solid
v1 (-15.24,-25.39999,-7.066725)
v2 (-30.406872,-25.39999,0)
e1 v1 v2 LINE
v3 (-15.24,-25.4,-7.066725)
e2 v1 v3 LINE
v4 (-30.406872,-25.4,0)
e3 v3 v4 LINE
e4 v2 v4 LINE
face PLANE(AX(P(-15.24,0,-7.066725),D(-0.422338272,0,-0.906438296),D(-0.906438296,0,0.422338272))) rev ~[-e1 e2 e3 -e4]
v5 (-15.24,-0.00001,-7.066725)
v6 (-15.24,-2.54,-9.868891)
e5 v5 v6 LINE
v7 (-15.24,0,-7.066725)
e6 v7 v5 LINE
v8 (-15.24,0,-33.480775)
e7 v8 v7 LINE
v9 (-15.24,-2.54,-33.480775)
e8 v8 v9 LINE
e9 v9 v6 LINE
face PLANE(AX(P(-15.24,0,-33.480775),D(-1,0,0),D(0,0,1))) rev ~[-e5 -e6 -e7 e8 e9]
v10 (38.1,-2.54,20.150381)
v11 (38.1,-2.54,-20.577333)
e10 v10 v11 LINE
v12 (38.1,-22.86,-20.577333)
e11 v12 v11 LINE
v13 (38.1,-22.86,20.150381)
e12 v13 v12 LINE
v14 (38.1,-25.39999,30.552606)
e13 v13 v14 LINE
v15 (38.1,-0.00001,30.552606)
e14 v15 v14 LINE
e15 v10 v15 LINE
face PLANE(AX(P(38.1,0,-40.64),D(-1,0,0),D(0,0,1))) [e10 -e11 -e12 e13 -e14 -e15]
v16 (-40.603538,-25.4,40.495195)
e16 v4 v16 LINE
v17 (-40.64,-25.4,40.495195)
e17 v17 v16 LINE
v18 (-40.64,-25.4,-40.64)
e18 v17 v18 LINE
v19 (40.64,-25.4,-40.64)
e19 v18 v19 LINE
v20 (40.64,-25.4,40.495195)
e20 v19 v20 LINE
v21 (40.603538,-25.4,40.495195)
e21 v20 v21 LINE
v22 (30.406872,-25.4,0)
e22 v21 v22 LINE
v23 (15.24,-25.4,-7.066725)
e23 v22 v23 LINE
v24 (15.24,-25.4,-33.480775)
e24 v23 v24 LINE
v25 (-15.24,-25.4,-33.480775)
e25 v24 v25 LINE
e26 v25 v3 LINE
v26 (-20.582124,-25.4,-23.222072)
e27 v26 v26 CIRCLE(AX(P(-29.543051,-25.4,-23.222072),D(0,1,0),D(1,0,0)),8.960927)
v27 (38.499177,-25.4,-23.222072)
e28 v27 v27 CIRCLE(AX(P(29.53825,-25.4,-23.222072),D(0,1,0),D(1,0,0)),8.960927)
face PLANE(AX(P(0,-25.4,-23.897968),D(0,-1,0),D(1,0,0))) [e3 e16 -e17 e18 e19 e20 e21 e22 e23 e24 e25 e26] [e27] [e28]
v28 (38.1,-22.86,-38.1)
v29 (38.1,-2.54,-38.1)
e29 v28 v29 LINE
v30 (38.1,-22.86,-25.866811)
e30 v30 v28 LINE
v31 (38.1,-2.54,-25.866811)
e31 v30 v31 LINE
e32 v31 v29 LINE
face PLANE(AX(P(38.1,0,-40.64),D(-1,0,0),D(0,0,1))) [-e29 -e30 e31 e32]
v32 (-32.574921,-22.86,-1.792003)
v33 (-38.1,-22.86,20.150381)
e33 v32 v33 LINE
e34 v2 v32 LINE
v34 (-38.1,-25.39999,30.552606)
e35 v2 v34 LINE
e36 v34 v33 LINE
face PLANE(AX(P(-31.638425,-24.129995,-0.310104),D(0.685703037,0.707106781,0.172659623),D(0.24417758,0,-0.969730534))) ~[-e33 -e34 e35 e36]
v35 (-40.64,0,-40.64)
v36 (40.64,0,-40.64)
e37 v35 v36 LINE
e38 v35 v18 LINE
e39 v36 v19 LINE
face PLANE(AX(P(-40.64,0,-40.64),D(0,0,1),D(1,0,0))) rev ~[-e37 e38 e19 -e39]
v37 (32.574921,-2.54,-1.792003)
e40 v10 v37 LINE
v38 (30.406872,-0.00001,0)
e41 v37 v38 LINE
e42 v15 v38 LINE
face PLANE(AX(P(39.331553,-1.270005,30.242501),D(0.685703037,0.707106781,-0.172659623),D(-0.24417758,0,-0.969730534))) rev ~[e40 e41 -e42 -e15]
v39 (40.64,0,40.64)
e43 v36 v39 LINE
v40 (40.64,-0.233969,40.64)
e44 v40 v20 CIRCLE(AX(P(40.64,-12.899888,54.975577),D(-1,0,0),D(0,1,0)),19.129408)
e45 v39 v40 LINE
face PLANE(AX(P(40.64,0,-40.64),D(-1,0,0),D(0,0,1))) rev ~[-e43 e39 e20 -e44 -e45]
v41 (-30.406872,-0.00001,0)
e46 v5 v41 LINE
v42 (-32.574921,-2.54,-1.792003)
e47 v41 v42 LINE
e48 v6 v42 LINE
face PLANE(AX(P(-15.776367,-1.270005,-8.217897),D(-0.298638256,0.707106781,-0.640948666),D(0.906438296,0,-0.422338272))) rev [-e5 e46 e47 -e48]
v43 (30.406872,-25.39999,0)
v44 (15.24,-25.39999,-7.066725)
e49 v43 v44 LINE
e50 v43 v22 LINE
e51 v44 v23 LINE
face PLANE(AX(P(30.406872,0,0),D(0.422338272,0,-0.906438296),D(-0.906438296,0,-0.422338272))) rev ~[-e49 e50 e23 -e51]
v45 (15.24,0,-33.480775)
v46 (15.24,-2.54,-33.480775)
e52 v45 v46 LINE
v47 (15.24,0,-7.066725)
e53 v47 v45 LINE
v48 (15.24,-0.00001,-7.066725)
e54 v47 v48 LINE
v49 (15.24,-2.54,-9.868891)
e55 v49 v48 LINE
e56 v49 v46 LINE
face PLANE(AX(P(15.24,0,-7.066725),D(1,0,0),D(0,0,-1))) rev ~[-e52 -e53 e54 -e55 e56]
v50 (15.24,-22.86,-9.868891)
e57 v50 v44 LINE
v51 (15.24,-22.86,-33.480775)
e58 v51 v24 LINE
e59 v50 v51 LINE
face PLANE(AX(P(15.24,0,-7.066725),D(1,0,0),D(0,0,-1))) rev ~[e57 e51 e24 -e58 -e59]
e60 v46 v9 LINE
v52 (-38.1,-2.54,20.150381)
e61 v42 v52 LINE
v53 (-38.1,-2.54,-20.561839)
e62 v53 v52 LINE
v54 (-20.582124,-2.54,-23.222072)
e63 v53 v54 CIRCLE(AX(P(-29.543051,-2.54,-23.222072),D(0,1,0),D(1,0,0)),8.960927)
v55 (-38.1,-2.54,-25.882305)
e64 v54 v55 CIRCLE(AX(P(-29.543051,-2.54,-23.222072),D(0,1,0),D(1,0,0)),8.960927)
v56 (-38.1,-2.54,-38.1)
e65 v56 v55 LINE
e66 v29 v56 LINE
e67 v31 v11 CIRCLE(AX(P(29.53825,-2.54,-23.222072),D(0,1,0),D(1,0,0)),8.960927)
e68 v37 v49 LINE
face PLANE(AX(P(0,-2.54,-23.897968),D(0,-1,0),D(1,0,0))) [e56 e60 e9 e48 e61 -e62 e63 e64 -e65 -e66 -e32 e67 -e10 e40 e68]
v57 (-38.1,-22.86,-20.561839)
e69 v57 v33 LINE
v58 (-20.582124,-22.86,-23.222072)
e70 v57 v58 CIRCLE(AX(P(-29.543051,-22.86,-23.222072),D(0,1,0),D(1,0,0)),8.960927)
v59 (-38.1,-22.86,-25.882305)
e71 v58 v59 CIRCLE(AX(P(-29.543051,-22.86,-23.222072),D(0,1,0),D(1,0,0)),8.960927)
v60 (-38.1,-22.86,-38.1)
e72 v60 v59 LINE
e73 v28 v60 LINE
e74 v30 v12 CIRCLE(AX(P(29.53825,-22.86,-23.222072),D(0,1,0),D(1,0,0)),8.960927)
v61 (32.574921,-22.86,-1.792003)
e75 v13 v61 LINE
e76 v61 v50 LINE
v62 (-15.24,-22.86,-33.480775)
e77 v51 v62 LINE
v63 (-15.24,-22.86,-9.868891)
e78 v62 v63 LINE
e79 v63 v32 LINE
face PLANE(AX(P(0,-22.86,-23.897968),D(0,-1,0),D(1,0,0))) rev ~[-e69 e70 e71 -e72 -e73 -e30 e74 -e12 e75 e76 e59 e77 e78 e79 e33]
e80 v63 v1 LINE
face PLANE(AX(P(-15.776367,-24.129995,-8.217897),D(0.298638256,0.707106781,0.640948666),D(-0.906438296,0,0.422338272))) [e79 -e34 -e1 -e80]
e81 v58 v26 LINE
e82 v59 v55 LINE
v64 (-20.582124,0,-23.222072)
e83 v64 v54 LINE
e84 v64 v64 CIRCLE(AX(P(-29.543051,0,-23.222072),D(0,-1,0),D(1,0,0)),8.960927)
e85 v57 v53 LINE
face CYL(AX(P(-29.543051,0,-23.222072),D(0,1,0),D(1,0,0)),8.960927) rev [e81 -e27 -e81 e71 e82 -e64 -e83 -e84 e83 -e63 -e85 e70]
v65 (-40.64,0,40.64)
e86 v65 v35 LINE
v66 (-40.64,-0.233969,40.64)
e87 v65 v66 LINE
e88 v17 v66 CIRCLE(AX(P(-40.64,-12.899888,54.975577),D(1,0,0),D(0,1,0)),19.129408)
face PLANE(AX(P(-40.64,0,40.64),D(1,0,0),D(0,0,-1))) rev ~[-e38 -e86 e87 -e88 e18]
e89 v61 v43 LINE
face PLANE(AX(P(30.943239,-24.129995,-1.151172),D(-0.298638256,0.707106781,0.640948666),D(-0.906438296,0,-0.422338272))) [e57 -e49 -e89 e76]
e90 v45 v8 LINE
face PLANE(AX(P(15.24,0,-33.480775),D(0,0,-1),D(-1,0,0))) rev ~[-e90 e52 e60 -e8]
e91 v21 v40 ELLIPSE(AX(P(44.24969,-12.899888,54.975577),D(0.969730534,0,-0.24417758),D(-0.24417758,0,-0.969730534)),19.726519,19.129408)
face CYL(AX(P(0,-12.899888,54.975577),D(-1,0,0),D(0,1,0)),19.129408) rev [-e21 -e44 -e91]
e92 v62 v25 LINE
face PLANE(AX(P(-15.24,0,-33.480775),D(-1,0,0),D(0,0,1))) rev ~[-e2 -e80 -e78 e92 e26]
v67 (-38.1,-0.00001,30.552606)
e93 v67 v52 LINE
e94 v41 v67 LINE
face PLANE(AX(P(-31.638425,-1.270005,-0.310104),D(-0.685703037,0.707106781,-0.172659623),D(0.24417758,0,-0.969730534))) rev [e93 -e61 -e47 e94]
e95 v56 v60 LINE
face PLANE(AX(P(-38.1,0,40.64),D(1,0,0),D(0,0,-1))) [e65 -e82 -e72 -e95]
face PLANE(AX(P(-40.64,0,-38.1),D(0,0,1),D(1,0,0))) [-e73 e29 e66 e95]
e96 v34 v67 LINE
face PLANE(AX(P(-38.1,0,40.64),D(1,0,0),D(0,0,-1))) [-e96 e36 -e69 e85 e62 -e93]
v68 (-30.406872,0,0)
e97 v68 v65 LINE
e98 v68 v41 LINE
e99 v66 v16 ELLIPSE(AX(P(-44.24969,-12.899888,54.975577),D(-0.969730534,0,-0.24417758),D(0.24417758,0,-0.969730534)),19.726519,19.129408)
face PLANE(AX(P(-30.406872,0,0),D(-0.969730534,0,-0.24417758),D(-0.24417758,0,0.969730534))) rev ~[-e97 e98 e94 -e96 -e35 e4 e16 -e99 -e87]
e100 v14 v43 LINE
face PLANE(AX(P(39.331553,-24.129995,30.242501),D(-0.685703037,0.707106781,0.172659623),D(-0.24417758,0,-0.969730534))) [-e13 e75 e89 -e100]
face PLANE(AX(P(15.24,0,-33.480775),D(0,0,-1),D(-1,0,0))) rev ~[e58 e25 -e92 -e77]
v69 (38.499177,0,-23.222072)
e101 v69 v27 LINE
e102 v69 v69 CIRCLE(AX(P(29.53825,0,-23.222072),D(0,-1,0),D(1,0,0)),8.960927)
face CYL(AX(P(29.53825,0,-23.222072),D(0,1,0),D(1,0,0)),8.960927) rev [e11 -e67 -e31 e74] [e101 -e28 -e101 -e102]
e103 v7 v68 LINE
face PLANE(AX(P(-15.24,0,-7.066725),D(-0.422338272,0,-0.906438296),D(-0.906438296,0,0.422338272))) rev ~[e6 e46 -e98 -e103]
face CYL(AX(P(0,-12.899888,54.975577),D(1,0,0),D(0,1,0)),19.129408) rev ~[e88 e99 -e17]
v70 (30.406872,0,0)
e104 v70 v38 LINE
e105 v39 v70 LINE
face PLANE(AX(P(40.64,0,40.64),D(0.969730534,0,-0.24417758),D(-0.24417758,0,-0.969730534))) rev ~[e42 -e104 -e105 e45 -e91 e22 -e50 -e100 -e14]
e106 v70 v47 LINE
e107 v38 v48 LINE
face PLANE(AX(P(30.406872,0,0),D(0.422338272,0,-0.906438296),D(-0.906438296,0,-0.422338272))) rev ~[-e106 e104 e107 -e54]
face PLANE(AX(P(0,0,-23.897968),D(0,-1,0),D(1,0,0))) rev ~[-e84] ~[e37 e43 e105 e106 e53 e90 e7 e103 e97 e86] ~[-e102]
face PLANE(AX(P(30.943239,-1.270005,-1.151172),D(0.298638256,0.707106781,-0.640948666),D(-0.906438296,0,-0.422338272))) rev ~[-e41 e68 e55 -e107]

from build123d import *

# Parameters (mm, degrees)
F1_DEPTH      = 25.4
F2_T          = -2.54
F3_R          = 8.9609270722
F4_DEPTH      = 105.41
F5_SIZE       = 2.53999
F6_R          = 19.1294081244
F7_DEPTH      = 254
F7_DEPTH_BACK = 170.942


# Not quite as in the source:
# - a fillet or chamfer is up to 0.001 mm smaller than in the source, because OpenCascade refuses the exact size


with BuildPart() as f1:
    # F0 (on Front) → F1 (new body)
    with BuildSketch(Plane.XZ):
        Polygon((40.64, -40.64), (40.64, 0), (30.4068718106, 0), (15.24, -7.0667252876), (15.24, -33.4807746112), (-15.24, -33.4807746112), (-15.24, -7.0667252876), (-30.4068718106, 0), (-40.64, 0), (-40.64, -40.64), align=None)
        Polygon((-30.4068718106, 0), (-40.64, 40.64), (-40.64, 0), align=None)
        Polygon((40.64, 0), (40.64, 40.64), (30.4068718106, 0), align=None)
    extrude(amount=F1_DEPTH)

    # F2
    f2_openings = [f1.faces().sort_by_distance(p)[0] for p in [
        (35.523436, -12.7, 20.32),
        (22.823436, -12.7, -3.533363),
        (15.24, -12.7, -20.27375),
        (0, -12.7, -33.480775),
        (-35.523436, -12.7, 20.32),
        (-22.823436, -12.7, -3.533363),
        (-15.24, -12.7, -20.27375),
    ]]
    offset(amount=F2_T, openings=f2_openings)

    # F3 (on Front) → F4 (cut)
    with BuildSketch(Plane.XZ):
        with Locations((-29.5430510807, -23.22207205)):
            Circle(F3_R)
        with Locations((29.538249597, -23.22207205)):
            Circle(F3_R)
    extrude(amount=F4_DEPTH, mode=Mode.SUBTRACT)

    # F5 (size 2.54 in the source; OpenCascade refuses exactly that, so slightly less here)
    f5_edges = [f1.edges().sort_by_distance(p)[0] for p in [
        (-34.253436, -22.86, 15.276303),
        (-22.823436, -22.86, -3.533363),
        (-34.253436, -2.54, 15.276303),
        (-22.823436, -2.54, -3.533363),
        (22.823436, -2.54, -3.533363),
        (34.253436, -2.54, 15.276303),
        (34.253436, -22.86, 15.276303),
        (22.823436, -22.86, -3.533363),
    ]]
    chamfer(f5_edges, length=F5_SIZE)

    # F6 (on Right) → F7 (cut, two sides)
    with BuildSketch(Plane.YZ) as f7_sk:
        with Locations((-12.8998877481, 54.9755766988)):
            Circle(F6_R)
    extrude(amount=-F7_DEPTH, mode=Mode.SUBTRACT)
    extrude(f7_sk.sketch, amount=F7_DEPTH_BACK, mode=Mode.SUBTRACT)


solid = f1.part
